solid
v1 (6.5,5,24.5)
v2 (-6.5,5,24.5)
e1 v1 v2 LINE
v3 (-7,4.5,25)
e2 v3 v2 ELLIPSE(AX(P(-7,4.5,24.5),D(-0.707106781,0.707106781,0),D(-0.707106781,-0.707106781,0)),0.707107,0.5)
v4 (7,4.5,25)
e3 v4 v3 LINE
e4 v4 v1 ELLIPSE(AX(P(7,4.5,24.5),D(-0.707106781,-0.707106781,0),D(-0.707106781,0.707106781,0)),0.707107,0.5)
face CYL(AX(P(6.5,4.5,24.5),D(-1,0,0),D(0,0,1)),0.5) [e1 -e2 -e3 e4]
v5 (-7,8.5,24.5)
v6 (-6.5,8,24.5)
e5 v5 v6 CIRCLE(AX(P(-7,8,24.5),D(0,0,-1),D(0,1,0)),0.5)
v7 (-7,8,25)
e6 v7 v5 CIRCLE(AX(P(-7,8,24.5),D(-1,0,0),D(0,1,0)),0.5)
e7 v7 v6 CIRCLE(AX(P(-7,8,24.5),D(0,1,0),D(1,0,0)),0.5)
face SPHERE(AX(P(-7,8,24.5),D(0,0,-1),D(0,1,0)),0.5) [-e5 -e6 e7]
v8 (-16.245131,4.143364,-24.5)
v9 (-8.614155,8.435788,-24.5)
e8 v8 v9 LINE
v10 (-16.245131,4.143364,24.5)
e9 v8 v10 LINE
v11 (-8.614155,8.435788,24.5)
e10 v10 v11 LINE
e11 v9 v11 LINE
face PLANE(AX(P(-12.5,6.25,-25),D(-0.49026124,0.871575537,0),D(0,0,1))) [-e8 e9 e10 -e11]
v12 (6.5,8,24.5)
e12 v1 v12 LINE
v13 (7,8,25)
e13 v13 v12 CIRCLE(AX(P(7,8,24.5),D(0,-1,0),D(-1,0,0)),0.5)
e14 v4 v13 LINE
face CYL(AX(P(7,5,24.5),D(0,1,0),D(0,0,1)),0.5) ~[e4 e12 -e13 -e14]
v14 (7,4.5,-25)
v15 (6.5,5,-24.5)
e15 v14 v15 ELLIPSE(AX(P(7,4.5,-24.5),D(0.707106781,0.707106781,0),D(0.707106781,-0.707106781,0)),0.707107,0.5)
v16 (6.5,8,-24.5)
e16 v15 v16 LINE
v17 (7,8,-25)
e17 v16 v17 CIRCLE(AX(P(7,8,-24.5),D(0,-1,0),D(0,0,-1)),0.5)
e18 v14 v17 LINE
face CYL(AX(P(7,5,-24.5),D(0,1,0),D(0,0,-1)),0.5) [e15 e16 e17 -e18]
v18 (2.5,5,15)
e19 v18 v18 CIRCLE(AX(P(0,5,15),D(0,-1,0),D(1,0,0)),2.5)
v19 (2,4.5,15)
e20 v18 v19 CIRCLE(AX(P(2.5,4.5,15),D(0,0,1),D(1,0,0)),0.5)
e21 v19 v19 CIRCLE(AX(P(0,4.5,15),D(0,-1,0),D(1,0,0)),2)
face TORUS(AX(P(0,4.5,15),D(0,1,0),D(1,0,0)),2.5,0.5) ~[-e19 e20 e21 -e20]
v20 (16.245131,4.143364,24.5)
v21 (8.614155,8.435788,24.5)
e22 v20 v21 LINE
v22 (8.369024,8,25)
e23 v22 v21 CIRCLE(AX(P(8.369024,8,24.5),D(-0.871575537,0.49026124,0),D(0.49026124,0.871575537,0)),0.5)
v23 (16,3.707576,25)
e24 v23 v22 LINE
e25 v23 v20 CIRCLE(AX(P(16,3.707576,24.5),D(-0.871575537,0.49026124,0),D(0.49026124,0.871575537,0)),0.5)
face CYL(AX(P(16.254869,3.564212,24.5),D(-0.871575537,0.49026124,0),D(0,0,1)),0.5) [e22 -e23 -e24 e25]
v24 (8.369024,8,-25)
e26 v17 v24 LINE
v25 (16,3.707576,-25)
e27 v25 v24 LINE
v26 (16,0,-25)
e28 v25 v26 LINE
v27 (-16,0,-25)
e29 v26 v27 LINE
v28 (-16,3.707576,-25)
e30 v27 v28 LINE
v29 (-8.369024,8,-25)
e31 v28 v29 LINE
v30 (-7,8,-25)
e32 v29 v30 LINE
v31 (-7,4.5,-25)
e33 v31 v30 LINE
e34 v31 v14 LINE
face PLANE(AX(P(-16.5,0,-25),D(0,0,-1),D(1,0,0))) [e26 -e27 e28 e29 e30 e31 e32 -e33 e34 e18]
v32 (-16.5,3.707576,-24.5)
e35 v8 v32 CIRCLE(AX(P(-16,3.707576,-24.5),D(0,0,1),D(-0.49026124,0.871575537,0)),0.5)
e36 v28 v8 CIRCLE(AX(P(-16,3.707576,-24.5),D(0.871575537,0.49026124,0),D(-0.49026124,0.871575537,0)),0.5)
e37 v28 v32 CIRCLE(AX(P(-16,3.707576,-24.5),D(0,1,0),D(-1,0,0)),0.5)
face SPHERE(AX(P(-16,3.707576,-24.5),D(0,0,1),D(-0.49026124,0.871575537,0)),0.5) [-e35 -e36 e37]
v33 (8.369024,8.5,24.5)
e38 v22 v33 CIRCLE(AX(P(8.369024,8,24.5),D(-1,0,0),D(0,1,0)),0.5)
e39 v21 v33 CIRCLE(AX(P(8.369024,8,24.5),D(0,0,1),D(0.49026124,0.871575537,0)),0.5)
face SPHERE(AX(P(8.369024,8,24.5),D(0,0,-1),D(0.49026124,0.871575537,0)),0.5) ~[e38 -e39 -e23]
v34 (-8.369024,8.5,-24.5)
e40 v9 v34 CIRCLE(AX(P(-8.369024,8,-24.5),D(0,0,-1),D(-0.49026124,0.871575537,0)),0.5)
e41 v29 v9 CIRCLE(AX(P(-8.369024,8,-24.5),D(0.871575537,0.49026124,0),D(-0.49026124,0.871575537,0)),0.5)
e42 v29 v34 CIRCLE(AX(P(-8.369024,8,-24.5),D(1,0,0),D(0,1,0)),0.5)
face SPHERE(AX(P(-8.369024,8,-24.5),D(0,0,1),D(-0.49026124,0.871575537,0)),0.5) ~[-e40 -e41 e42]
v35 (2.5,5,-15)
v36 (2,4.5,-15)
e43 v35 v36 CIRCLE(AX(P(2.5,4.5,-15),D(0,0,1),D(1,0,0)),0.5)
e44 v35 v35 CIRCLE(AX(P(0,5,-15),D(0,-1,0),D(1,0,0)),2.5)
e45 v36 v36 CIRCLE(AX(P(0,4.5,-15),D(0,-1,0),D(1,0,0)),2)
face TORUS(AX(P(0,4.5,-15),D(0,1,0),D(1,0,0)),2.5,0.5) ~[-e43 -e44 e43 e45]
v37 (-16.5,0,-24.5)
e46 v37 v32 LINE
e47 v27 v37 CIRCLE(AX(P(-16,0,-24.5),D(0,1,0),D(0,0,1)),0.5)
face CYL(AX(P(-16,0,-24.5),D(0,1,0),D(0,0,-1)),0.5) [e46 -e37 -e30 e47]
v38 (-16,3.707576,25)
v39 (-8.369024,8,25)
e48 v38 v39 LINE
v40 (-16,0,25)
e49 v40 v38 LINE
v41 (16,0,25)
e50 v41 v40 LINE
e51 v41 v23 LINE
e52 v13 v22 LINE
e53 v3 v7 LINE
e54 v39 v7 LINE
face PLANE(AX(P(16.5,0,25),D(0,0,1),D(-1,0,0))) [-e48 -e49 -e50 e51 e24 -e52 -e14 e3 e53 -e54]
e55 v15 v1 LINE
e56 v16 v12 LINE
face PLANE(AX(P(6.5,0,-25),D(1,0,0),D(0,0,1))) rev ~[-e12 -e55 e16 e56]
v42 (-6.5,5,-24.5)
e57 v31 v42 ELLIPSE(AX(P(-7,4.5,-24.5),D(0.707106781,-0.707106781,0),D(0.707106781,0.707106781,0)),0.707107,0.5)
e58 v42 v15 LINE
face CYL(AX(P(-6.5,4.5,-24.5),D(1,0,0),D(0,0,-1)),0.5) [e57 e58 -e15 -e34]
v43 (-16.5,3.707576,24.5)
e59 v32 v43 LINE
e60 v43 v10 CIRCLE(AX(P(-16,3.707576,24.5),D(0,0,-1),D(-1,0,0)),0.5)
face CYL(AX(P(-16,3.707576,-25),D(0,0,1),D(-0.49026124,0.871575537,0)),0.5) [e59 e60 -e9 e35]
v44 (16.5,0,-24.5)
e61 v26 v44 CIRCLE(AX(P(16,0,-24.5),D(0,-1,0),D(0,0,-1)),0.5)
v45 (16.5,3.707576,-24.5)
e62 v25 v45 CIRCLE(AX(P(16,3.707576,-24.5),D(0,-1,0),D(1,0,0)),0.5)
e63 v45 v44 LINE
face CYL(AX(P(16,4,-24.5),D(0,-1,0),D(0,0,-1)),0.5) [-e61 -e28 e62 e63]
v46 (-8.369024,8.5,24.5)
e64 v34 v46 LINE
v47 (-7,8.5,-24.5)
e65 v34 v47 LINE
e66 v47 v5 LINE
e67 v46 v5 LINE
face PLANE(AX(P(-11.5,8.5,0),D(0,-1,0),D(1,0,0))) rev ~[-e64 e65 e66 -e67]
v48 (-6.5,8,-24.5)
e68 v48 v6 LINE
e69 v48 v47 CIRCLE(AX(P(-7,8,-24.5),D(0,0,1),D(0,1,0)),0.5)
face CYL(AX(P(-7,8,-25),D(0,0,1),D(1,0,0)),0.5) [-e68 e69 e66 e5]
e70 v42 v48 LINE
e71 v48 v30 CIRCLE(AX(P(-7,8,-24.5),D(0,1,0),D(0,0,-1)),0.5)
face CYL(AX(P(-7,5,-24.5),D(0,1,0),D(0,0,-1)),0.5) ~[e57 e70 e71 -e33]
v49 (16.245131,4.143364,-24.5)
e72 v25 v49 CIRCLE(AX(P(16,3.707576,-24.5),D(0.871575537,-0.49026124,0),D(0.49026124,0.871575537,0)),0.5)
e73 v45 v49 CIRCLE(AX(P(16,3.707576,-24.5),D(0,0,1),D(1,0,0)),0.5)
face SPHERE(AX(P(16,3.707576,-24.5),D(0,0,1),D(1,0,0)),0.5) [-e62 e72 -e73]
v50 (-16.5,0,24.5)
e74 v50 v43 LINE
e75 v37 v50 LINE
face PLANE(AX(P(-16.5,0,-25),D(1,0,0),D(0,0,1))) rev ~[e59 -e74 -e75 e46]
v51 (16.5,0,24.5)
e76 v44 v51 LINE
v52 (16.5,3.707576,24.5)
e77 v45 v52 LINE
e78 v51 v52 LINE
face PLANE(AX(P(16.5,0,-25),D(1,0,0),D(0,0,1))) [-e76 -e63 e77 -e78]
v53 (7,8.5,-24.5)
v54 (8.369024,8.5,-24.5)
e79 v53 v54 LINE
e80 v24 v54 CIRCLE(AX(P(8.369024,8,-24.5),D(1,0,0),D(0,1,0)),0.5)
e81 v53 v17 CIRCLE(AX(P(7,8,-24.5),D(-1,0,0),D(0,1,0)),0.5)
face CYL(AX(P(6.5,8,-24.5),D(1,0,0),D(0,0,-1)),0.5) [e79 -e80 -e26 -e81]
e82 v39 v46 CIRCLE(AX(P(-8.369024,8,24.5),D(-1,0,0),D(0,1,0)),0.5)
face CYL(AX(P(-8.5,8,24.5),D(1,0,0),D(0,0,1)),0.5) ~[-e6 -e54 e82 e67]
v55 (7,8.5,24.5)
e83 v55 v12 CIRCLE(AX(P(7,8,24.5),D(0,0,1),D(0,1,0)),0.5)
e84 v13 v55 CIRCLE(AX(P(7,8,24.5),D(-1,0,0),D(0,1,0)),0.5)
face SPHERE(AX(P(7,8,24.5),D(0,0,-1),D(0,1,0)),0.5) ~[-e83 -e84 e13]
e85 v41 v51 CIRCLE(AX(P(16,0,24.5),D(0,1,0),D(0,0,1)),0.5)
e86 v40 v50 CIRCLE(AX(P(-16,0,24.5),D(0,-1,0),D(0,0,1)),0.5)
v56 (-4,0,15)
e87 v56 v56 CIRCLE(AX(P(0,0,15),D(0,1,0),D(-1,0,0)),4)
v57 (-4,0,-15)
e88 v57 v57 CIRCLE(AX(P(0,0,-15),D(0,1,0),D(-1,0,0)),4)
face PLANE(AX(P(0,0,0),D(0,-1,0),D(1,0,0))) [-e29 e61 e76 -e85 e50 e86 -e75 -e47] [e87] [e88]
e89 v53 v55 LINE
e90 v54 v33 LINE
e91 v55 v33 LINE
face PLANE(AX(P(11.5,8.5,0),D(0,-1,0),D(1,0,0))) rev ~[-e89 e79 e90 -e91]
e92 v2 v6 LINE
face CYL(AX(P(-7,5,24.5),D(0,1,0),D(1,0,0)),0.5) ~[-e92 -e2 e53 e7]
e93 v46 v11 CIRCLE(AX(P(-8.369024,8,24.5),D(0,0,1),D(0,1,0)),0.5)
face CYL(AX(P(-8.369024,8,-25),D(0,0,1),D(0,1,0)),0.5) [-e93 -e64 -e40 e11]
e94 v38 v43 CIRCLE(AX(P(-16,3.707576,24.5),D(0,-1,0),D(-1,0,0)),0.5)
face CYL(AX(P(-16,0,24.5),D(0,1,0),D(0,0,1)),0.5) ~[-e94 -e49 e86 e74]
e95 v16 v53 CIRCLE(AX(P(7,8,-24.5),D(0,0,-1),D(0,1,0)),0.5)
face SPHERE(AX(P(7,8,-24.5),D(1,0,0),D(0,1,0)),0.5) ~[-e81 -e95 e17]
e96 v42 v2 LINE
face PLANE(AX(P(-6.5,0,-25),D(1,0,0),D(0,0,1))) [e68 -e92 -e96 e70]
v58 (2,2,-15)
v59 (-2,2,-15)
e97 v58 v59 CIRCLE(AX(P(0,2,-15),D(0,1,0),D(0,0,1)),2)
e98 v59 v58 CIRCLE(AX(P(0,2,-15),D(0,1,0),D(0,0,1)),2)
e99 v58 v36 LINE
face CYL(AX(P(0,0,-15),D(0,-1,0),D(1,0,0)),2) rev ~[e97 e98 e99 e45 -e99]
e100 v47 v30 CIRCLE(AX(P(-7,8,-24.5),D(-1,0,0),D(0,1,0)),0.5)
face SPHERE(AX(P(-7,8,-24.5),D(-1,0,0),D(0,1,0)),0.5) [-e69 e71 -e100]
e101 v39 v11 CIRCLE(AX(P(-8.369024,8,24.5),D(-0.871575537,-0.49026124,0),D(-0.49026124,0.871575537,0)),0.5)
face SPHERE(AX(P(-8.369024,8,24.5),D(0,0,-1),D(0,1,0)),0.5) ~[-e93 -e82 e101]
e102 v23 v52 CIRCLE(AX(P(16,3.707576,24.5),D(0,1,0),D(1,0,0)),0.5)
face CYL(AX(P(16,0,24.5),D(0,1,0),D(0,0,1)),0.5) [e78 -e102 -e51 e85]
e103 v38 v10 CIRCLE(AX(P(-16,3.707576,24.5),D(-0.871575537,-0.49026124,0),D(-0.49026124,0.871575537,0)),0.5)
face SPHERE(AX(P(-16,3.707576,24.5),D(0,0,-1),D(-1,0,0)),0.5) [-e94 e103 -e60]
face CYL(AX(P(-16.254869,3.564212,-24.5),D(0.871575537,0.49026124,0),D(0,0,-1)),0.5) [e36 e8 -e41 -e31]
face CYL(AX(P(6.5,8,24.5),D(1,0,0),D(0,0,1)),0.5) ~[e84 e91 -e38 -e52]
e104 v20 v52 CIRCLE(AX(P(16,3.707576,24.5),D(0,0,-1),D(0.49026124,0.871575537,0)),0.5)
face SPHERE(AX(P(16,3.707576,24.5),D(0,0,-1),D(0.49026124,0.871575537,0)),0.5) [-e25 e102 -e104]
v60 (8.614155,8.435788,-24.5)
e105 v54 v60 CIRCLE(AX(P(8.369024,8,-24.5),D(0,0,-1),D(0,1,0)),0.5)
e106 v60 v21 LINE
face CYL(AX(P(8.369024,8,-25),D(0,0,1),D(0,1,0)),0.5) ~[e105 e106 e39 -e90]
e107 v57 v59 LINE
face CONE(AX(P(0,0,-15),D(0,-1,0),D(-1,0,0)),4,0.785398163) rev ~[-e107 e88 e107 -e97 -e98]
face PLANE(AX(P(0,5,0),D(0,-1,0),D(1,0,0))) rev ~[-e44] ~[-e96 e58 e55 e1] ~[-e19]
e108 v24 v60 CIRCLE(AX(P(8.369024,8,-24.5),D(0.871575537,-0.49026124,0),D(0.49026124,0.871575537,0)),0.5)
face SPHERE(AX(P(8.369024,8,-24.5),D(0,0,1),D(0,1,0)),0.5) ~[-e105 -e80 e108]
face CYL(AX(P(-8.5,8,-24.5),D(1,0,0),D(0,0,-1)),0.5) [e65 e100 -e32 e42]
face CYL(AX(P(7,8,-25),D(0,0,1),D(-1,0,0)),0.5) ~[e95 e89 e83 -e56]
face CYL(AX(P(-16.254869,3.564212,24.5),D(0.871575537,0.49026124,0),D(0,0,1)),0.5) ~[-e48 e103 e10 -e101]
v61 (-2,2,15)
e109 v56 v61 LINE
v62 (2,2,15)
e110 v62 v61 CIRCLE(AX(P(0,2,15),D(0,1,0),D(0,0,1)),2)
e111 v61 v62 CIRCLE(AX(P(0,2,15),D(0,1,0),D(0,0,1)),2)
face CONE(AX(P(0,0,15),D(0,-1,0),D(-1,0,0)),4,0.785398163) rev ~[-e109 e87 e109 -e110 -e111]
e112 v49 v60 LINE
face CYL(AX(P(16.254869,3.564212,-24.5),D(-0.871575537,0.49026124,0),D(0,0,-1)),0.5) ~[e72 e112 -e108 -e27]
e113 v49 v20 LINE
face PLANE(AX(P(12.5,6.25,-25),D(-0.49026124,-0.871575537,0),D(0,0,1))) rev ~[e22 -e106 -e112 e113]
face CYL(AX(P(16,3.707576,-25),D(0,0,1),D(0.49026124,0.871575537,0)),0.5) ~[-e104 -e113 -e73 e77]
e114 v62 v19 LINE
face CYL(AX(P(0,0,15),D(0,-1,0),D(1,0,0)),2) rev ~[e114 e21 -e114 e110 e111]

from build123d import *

# Parameters (mm, degrees)
F0_W           = 12
F0_H           = 50
F0_R           = 2
F0_W_2         = 0.5
F0_W_3         = 10
F1_DEPTH       = 5
F2_DEPTH       = 8.5
F3_SIZE2       = 8
F3_SIZE        = 4.5
F4_SIZE2       = 8
F4_SIZE        = 4.5
F5_D           = 4
F5_CSINK_D     = 8
F5_CSINK_ANGLE = 90
F6_R           = 0.5


with BuildPart() as f1:
    # F0 (on Front) → F1 (new body)
    with BuildSketch(Plane.XZ):
        Rectangle(F0_W, F0_H)
        with Locations((0, -15)):
            Circle(F0_R, mode=Mode.SUBTRACT)
        with Locations((0, 15)):
            Circle(F0_R, mode=Mode.SUBTRACT)
        with Locations((6.25, 0)):
            Rectangle(F0_W_2, F0_H)
        with Locations((-6.25, 0)):
            Rectangle(F0_W_2, F0_H)
        with Locations((11.5, 0)):
            Rectangle(F0_W_3, F0_H)
        with Locations((-11.5, 0)):
            Rectangle(F0_W_3, F0_H)
    extrude(amount=-F1_DEPTH)

    # F0 (on Front) → F2 (join)
    with BuildSketch(Plane.XZ):
        with Locations((-11.5, 0)):
            Rectangle(F0_W_3, F0_H)
        with Locations((11.5, 0)):
            Rectangle(F0_W_3, F0_H)
    extrude(amount=-F2_DEPTH)

    # F3
    f3_edges = [f1.edges().sort_by_distance(p)[0] for p in [
        (-16.5, 8.5, 0),
    ]]
    f3_side = f1.faces().sort_by_distance((-16.5, 4.25, 0))[0]
    chamfer(f3_edges, length=F3_SIZE, length2=F3_SIZE2, reference=f3_side)

    # F4
    f4_edges = [f1.edges().sort_by_distance(p)[0] for p in [
        (16.5, 8.5, 0),
    ]]
    f4_side = f1.faces().sort_by_distance((16.5, 4.25, 0))[0]
    chamfer(f4_edges, length=F4_SIZE, length2=F4_SIZE2, reference=f4_side)

    # F5 (through all)
    with Locations(Plane.XZ):
        with Locations((0, 15), (0, -15)):
            CounterSinkHole(F5_D / 2, F5_CSINK_D / 2, counter_sink_angle=F5_CSINK_ANGLE)

    # F6
    f6_edges = [f1.edges().sort_by_distance(p)[0] for p in [
        (12.5, 6.25, -25),
        (16.5, 4, 0),
        (8.5, 8.5, 0),
        (12.5, 6.25, 25),
        (7.5, 8.5, -25),
        (6.5, 8.5, 0),
        (7.5, 8.5, 25),
        (-7.5, 8.5, -25),
        (-8.5, 8.5, 0),
        (-6.5, 8.5, 0),
        (-7.5, 8.5, 25),
        (-12.5, 6.25, 25),
        (-16.5, 4, 0),
        (-12.5, 6.25, -25),
        (-2, 5, -15),
        (-2, 5, 15),
        (0, 5, -25),
        (6.5, 6.75, -25),
        (-6.5, 6.75, -25),
        (-16.5, 2, -25),
        (16.5, 2, -25),
        (16.5, 2, 25),
        (6.5, 6.75, 25),
        (0, 5, 25),
        (-6.5, 6.75, 25),
        (-16.5, 2, 25),
    ]]
    fillet(f6_edges, radius=F6_R)


solid = f1.part
